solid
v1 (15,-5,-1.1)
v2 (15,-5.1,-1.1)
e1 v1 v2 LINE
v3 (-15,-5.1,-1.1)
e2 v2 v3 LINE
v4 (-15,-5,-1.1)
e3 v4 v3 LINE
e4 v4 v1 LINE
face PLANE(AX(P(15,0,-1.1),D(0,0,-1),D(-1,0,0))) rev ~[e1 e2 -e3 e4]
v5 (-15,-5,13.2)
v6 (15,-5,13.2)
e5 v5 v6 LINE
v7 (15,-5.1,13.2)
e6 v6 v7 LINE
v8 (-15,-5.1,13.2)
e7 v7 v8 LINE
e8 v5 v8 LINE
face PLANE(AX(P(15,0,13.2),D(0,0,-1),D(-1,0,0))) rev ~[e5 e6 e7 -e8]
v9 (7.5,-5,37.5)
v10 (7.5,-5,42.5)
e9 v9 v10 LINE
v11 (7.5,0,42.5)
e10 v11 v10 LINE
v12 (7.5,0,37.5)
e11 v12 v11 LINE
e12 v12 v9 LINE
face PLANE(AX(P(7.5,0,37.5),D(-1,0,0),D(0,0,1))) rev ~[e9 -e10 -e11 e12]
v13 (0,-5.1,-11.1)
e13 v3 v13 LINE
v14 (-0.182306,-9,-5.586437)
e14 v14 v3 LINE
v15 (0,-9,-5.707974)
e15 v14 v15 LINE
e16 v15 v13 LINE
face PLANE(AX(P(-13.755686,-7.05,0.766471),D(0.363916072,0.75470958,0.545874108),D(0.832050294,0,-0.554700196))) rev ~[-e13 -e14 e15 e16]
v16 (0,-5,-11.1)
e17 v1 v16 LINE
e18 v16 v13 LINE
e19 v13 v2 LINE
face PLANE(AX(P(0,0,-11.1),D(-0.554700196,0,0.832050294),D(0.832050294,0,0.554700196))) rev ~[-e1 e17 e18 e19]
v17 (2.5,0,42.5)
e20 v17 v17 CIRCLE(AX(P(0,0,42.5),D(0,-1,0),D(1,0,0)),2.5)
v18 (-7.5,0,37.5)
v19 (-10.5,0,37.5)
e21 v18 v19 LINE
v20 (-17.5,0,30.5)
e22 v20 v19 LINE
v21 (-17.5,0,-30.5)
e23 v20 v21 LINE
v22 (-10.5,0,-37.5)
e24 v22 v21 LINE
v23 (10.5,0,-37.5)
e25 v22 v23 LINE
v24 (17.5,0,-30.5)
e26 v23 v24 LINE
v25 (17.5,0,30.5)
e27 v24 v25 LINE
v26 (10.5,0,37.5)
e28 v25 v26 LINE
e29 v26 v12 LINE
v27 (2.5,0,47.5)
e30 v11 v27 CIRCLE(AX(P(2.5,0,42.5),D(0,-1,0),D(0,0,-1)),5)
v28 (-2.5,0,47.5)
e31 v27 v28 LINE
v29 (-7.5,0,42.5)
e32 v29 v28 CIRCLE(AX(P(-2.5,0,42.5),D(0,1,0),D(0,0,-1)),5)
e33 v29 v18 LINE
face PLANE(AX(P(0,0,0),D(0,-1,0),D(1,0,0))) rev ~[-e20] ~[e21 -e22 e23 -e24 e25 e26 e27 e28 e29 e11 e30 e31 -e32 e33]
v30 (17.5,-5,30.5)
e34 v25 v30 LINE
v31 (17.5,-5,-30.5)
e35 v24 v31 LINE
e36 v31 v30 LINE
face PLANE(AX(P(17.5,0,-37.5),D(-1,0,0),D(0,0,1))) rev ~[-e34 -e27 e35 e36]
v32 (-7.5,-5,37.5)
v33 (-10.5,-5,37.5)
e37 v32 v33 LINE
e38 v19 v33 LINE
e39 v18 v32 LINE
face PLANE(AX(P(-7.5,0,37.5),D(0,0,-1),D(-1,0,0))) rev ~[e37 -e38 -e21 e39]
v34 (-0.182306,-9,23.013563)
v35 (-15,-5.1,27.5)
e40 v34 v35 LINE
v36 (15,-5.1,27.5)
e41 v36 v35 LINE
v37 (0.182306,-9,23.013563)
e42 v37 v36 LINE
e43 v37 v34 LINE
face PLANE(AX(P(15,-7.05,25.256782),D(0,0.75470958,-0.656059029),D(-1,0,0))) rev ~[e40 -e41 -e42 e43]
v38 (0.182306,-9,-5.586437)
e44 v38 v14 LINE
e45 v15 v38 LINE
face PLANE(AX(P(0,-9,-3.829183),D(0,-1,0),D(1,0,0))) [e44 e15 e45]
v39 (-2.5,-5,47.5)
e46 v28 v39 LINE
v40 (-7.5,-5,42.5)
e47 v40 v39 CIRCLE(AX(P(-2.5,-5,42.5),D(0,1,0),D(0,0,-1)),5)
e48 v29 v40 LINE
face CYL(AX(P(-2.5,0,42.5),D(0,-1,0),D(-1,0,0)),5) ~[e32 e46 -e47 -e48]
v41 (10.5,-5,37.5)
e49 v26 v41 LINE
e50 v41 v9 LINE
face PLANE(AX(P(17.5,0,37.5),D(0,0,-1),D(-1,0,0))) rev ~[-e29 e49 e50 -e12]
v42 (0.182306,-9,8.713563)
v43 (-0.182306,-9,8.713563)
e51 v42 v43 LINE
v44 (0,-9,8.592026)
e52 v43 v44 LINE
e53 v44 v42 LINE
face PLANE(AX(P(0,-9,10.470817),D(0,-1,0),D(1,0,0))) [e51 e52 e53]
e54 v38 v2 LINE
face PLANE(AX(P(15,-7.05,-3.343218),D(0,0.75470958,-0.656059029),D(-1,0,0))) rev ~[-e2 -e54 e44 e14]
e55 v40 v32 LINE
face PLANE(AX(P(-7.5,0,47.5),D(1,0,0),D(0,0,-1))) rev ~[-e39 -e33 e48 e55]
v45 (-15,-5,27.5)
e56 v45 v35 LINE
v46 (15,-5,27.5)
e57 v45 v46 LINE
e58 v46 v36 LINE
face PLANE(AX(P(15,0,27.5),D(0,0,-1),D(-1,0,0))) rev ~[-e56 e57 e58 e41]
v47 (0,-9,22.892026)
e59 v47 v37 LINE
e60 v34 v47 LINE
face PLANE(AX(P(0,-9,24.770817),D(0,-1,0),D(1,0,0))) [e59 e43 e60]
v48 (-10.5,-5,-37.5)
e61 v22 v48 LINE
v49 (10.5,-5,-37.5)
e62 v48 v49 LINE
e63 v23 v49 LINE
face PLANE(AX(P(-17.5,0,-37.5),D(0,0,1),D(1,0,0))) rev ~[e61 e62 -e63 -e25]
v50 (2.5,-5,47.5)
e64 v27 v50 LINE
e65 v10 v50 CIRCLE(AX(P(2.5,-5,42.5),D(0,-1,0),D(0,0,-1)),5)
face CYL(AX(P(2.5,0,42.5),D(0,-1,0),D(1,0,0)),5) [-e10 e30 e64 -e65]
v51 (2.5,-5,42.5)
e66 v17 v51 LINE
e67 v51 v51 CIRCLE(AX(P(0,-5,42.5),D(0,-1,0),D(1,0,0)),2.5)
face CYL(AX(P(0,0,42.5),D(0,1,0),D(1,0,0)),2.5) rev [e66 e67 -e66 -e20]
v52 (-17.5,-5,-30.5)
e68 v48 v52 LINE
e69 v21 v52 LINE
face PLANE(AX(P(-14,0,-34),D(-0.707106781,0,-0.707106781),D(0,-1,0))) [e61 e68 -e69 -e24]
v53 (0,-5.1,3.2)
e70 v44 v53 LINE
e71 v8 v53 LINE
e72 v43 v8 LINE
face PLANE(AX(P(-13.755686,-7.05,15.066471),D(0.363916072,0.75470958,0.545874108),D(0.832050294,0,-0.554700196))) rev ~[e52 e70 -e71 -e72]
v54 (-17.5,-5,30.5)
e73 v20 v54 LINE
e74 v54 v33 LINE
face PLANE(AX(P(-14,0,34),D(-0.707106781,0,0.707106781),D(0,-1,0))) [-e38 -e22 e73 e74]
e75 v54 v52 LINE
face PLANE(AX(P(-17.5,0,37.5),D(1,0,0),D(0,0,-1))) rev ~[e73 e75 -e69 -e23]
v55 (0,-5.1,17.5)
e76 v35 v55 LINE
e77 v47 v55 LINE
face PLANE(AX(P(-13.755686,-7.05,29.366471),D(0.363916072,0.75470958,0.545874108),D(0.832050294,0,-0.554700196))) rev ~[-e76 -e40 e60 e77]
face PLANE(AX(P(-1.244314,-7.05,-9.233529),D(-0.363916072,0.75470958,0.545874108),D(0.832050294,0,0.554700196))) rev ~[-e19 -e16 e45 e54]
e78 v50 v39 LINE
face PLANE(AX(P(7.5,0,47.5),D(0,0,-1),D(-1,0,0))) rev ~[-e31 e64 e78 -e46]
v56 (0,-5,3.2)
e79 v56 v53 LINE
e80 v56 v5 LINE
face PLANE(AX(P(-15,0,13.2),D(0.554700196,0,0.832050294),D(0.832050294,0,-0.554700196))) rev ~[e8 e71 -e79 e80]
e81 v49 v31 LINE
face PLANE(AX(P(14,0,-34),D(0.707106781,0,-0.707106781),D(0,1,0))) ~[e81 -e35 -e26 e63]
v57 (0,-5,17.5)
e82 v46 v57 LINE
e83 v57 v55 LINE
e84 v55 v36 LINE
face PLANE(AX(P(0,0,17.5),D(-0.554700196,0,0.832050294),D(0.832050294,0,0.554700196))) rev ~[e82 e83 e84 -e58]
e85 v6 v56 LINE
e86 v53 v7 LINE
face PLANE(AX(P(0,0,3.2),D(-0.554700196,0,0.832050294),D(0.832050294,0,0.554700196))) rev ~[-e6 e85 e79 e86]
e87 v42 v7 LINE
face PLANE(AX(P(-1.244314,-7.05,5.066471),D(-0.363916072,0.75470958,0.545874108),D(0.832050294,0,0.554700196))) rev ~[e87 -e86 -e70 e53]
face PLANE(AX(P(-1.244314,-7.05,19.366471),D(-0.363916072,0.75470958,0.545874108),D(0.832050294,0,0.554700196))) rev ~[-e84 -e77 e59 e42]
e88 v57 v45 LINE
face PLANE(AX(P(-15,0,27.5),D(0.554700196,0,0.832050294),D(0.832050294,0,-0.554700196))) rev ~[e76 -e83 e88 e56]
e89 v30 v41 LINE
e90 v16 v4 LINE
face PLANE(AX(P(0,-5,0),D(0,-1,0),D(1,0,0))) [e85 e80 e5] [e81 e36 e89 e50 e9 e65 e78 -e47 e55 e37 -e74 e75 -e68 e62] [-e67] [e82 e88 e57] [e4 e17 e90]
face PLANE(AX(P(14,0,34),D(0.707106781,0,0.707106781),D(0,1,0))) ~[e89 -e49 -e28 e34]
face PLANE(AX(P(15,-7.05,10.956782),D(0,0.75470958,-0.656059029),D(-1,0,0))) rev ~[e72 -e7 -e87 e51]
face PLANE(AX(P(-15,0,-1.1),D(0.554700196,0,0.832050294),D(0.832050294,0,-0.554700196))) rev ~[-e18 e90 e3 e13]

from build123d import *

# Parameters (mm, degrees)
F0_R       = 2.5
F1_DEPTH   = 5
F2_SIZE    = 7
F3_DEPTH   = 10
F4_R       = 5
F5_DEPTH   = 9
F6_SIZE2   = 3.9
F6_SIZE    = 4.4864367882
F6_2_SIZE2 = 3.9
F6_2_SIZE  = 4.4864367882
F6_3_SIZE2 = 3.9
F6_3_SIZE  = 4.4864367882


# Not quite as in the source:
# - a feature names something its author has since deleted; it is built from what else it names


with BuildPart() as f1:
    # F0 (on Front) → F1 (new body)
    with BuildSketch(Plane.XZ):
        Polygon((17.5, -37.5), (17.5, 37.5), (7.5, 37.5), (0, 37.5), (-7.5, 37.5), (-17.5, 37.5), (-17.5, -37.5), align=None)
        Polygon((0, -11.1), (-15, -1.1), (15, -1.1), align=None, mode=Mode.SUBTRACT)
        Polygon((0, 3.2), (-15, 13.2), (15, 13.2), align=None, mode=Mode.SUBTRACT)
        Polygon((0, 17.5), (-15, 27.5), (15, 27.5), align=None, mode=Mode.SUBTRACT)
        Polygon((0, 37.5), (7.5, 37.5), (7.5, 47.5), (0, 47.5), (-7.5, 47.5), (-7.5, 37.5), align=None)
        with Locations((0, 42.5)):
            Circle(F0_R, mode=Mode.SUBTRACT)
    extrude(amount=F1_DEPTH)

    # F2
    f2_edges = [f1.edges().sort_by_distance(p)[0] for p in [
        (-17.5, -2.5, 37.5),
        (17.5, -2.5, 37.5),
        (-17.5, -2.5, -37.5),
        (17.5, -2.5, -37.5),
    ]]
    chamfer(f2_edges, length=F2_SIZE)

    # F0 (on Front) → F3 (cut)
    with BuildSketch(Plane.XZ):
        with Locations((0, 42.5)):
            Circle(F0_R)
    extrude(amount=-F3_DEPTH, mode=Mode.SUBTRACT)

    # F4
    f4_edges = [f1.edges().sort_by_distance(p)[0] for p in [
        (-7.5, -2.5, 47.5),
        (7.5, -2.5, 47.5),
    ]]
    fillet(f4_edges, radius=F4_R)

    # F0 (on Front) → F5 (join)
    with BuildSketch(Plane.XZ):
        Polygon((15, 27.5), (-15, 27.5), (0, 17.5), align=None)
        Polygon((15, 13.2), (-15, 13.2), (0, 3.2), align=None)
        Polygon((15, -1.1), (-15, -1.1), (0, -11.1), align=None)
    extrude(amount=F5_DEPTH)

    # F6
    f6_edges = [f1.edges().sort_by_distance(p)[0] for p in [
        (0, -9, -1.1),
        (-7.5, -9, -6.1),
        (7.5, -9, -6.1),
    ]]
    f6_side = f1.faces().sort_by_distance((0, -9, -4.433333))[0]
    chamfer(f6_edges, length=F6_SIZE, length2=F6_SIZE2, reference=f6_side)

    # F6#2
    f6_2_edges = [f1.edges().sort_by_distance(p)[0] for p in [
        (0, -9, 13.2),
        (-7.5, -9, 8.2),
        (7.5, -9, 8.2),
    ]]
    f6_2_side = f1.faces().sort_by_distance((0, -9, 9.866667))[0]
    chamfer(f6_2_edges, length=F6_2_SIZE, length2=F6_2_SIZE2, reference=f6_2_side)

    # F6#3
    f6_3_edges = [f1.edges().sort_by_distance(p)[0] for p in [
        (0, -9, 27.5),
        (-7.5, -9, 22.5),
        (7.5, -9, 22.5),
    ]]
    f6_3_side = f1.faces().sort_by_distance((0, -9, 24.166667))[0]
    chamfer(f6_3_edges, length=F6_3_SIZE, length2=F6_3_SIZE2, reference=f6_3_side)


solid = f1.part
